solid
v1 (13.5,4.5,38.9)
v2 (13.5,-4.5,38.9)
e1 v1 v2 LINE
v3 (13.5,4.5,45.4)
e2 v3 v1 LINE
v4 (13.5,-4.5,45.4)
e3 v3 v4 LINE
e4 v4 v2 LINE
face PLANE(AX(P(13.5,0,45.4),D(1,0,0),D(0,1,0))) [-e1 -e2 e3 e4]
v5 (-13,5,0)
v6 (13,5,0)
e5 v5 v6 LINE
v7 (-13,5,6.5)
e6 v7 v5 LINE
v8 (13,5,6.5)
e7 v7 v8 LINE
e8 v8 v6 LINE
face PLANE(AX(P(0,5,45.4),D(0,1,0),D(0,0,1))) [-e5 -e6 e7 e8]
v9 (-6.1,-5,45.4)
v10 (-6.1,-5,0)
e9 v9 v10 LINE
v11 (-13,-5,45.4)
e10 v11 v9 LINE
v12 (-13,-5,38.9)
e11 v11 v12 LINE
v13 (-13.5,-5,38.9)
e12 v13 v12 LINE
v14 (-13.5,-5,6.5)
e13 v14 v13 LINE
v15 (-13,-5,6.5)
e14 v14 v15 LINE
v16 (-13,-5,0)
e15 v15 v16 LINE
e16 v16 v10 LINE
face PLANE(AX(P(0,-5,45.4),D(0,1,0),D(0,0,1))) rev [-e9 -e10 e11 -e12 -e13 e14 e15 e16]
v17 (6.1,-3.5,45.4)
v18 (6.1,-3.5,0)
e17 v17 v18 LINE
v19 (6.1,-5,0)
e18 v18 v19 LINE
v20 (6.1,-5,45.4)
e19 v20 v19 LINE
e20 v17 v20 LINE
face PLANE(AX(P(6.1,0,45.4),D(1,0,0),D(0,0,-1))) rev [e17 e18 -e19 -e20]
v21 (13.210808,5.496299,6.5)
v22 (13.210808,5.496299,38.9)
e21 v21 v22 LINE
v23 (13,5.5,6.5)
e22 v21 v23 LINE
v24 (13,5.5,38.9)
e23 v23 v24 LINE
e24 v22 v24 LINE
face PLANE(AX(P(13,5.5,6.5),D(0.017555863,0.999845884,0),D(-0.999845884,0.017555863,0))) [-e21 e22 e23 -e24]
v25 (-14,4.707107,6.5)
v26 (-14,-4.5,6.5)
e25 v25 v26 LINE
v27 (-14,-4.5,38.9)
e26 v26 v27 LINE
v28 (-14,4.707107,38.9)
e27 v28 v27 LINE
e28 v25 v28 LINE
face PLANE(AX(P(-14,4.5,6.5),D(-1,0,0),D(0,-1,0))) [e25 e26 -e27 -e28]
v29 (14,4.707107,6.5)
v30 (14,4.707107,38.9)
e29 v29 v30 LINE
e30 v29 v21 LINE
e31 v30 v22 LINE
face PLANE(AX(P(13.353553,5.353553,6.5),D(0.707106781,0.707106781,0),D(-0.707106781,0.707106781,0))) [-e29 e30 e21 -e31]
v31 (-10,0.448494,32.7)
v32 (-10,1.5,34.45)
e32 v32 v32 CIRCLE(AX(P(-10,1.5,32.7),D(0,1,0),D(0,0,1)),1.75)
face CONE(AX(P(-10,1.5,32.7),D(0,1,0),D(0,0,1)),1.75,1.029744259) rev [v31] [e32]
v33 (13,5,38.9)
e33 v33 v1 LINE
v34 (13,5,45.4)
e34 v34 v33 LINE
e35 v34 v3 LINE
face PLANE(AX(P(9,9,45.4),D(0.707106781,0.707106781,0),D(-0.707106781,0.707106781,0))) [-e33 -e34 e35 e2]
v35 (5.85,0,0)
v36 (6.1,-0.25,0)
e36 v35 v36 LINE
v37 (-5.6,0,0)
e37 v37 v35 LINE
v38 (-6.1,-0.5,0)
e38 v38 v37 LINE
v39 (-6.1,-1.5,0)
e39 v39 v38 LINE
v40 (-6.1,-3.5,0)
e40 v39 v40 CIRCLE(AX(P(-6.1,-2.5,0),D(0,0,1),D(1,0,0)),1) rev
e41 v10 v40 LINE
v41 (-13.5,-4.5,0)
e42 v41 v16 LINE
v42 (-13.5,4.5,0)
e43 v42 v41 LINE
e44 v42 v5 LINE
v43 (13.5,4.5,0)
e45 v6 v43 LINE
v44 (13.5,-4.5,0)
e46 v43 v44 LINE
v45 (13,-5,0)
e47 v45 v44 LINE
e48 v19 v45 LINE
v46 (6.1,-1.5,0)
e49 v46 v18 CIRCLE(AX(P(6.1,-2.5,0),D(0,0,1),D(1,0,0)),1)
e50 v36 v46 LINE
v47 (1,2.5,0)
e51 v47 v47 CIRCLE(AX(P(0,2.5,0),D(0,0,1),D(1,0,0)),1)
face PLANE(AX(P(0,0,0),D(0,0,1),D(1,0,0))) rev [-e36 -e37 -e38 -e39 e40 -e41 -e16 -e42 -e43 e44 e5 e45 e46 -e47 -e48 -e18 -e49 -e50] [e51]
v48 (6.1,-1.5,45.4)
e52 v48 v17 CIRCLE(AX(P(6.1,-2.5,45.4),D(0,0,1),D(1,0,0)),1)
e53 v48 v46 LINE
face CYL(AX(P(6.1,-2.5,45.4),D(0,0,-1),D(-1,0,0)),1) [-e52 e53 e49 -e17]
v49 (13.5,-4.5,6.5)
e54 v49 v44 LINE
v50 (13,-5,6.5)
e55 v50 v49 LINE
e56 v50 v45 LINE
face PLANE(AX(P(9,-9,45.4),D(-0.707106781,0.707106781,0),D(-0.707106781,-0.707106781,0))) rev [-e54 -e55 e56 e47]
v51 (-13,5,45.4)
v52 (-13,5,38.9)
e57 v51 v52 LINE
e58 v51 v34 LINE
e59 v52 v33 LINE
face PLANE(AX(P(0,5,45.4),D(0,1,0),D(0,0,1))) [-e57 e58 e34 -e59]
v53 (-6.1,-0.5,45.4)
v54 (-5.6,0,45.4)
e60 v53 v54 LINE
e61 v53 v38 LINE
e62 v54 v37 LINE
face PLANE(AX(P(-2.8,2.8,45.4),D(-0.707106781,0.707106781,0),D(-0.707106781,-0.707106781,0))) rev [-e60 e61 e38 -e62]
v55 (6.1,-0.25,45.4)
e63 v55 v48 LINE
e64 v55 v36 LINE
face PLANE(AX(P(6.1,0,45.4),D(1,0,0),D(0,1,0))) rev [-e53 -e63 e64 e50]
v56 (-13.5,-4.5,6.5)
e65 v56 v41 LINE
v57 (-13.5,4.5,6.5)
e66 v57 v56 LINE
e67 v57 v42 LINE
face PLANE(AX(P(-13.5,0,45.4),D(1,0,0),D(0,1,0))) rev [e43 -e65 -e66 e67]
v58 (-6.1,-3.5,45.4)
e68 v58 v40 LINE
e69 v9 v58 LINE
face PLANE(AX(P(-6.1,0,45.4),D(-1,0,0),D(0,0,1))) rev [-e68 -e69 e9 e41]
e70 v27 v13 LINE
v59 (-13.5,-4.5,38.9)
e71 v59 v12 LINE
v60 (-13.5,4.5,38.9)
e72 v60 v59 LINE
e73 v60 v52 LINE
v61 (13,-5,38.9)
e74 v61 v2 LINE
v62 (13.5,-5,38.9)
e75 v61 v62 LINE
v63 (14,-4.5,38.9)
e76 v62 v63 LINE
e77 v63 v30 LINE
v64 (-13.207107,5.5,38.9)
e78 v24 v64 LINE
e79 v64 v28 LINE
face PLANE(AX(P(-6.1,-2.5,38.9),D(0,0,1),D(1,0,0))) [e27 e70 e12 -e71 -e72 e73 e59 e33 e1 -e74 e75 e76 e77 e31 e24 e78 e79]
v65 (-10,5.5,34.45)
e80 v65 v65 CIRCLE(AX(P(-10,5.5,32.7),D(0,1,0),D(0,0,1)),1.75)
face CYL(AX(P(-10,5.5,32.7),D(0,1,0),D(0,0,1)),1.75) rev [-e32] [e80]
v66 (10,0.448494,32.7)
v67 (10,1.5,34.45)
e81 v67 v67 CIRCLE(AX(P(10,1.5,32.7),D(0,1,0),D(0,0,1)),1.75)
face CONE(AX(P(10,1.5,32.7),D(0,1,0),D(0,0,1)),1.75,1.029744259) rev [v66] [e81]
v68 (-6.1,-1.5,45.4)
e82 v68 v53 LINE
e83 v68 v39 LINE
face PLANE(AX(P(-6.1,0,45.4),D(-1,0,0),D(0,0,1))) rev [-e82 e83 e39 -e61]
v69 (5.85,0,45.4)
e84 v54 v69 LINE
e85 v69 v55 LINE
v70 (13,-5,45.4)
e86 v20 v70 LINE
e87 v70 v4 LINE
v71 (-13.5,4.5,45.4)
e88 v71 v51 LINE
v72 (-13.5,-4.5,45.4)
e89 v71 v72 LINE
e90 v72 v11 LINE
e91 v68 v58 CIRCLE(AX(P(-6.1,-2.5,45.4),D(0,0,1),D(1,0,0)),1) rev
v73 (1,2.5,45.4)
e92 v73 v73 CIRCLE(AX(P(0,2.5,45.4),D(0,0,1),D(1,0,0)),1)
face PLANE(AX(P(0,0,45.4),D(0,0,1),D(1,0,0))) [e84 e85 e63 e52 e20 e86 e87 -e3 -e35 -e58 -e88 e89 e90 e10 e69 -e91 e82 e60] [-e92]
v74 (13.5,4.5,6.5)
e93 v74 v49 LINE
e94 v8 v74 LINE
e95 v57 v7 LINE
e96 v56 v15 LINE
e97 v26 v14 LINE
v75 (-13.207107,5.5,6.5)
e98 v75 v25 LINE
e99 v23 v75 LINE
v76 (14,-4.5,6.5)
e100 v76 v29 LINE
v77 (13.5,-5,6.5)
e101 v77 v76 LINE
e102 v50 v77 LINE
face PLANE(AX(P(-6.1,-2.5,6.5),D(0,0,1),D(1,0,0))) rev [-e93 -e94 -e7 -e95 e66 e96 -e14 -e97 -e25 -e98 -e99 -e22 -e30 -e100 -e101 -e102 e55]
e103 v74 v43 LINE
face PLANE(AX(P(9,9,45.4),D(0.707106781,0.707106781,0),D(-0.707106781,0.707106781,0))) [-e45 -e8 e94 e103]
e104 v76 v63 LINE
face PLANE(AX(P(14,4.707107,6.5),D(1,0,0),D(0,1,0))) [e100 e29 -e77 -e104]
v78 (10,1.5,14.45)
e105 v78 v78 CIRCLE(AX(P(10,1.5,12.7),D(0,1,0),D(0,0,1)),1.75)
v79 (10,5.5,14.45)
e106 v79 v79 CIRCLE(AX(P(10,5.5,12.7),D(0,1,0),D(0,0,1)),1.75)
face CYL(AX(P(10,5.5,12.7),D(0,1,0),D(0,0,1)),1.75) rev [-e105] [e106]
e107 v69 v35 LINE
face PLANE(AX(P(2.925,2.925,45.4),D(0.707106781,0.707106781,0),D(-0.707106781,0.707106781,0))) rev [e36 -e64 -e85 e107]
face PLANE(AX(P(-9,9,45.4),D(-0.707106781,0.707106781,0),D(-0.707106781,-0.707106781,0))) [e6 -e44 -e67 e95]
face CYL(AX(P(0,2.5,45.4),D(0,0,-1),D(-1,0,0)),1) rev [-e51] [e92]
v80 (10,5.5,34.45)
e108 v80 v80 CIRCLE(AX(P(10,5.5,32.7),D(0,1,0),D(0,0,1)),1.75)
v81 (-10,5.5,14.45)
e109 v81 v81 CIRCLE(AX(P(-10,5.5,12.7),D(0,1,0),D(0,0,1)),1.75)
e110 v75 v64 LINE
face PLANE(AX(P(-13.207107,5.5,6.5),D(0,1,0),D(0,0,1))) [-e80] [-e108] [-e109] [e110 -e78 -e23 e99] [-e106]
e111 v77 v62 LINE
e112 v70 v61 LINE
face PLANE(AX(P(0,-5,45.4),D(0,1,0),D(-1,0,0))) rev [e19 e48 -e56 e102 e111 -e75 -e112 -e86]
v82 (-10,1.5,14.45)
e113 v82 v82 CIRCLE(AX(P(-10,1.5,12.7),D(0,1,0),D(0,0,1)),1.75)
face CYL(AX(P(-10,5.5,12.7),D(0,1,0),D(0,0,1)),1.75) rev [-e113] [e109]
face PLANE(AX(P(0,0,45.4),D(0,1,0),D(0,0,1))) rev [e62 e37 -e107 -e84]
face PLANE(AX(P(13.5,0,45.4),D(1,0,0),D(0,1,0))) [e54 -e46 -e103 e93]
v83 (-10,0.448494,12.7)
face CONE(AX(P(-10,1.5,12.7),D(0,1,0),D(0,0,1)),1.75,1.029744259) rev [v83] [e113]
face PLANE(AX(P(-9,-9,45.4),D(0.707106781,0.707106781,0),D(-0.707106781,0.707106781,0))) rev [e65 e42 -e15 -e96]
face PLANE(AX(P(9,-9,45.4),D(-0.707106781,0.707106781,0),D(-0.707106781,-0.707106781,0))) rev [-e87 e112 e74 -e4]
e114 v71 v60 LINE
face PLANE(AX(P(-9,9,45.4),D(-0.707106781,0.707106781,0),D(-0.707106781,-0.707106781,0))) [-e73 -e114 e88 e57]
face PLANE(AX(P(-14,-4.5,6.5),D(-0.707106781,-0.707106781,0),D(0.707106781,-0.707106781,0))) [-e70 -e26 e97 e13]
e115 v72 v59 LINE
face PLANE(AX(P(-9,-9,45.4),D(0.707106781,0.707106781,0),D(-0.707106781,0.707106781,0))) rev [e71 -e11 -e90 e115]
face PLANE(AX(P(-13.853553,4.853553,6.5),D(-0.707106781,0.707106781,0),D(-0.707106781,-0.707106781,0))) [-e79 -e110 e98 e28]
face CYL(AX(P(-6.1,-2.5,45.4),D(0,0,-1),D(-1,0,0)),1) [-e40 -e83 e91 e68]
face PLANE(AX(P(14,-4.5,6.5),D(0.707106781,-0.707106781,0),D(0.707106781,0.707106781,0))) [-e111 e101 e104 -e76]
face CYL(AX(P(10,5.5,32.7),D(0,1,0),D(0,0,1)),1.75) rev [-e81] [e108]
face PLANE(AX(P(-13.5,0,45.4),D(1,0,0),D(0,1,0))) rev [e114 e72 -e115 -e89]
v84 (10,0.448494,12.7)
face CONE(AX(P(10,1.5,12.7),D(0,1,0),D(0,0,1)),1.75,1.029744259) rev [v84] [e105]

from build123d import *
from build123d.topology import SkipClean

# Parameters (mm, degrees)
SKETCH1_R                 = 1
BOSS_EXTRUDE1_DEPTH       = 45.4
BOSS_EXTRUDE2_START       = -38.9
SKETCH5_R                 = 1
BOSS_EXTRUDE2_DEPTH       = 32.4
M5X0_8_TAPPED_HOLE1_D     = 3.5
M5X0_8_TAPPED_HOLE1_DEPTH = 4
M5X0_8_TAPPED_HOLE1_TIP   = 1.051506083


with BuildPart() as part:
    # Sketch1 → Boss-Extrude1 (new body)
    with BuildSketch(Plane.XY):
        with BuildLine():
            Line((-13.5, -4.5), (-13, -5))
            Line((-13, -5), (-6.1, -5))
            Line((-6.1, -5), (-6.1, -3.5))
            ThreePointArc((-6.1, -3.5), (-5.1, -2.5), (-6.1, -1.5))
            Line((-6.1, -1.5), (-6.1, -0.5))
            Line((-6.1, -0.5), (-5.6, 0))
            Line((-5.6, 0), (5.85, 0))
            Line((5.85, 0), (6.1, -0.25))
            Line((6.1, -0.25), (6.1, -1.5))
            ThreePointArc((6.1, -1.5), (5.1, -2.5), (6.1, -3.5))
            Line((6.1, -3.5), (6.1, -5))
            Line((6.1, -5), (13, -5))
            Line((13, -5), (13.5, -4.5))
            Line((13.5, -4.5), (13.5, 4.5))
            Line((13.5, 4.5), (13, 5))
            Line((13, 5), (-13, 5))
            Line((-13, 5), (-13.5, 4.5))
            Line((-13.5, 4.5), (-13.5, -4.5))
        make_face()
        with Locations((0, 2.5)):
            Circle(SKETCH1_R, mode=Mode.SUBTRACT)
    extrude(amount=BOSS_EXTRUDE1_DEPTH)

    # Sketch5 → Boss-Extrude2 (add)
    with SkipClean():  # the faces are left unmerged after this step: merging them gives an invalid solid
        with BuildSketch(Plane.XY.offset(45.4).offset(BOSS_EXTRUDE2_START)):
            with BuildLine():
                Line((13, 5.5), (13.210808273, 5.496298508))
                Line((13.210808273, 5.496298508), (13.353553391, 5.353553391))
                Line((13.353553391, 5.353553391), (14, 4.707106781))
                Line((14, 4.707106781), (14, -4.5))
                Line((14, -4.5), (13.5, -5))
                Line((13.5, -5), (6.1, -5))
                Line((6.1, -5), (6.1, -3.5))
                ThreePointArc((6.1, -3.5), (5.1, -2.5), (6.1, -1.5))
                Line((6.1, -1.5), (6.1, -0.25))
                Line((6.1, -0.25), (5.85, 0))
                Line((5.85, 0), (-5.6, 0))
                Line((-5.6, 0), (-6.1, -0.5))
                Line((-6.1, -0.5), (-6.1, -1.5))
                ThreePointArc((-6.1, -1.5), (-5.1, -2.5), (-6.1, -3.5))
                Line((-6.1, -3.5), (-6.1, -5))
                Line((-6.1, -5), (-13.5, -5))
                Line((-13.5, -5), (-14, -4.5))
                Line((-14, -4.5), (-14, 4.5))
                Line((-14, 4.5), (-14, 4.707106781))
                Line((-14, 4.707106781), (-13.853553391, 4.853553391))
                Line((-13.853553391, 4.853553391), (-13.207106781, 5.5))
                Line((-13.207106781, 5.5), (13, 5.5))
            make_face()
            with Locations((0, 2.5)):
                Circle(SKETCH5_R, mode=Mode.SUBTRACT)
        extrude(amount=BOSS_EXTRUDE2_DEPTH)
    add(part.part.scale(1), mode=Mode.REPLACE)  # the faces are merged on a copy

    # M5x0.8 Tapped Hole1
    with Locations(Plane(origin=(0, 5.5, 0), x_dir=(1, 0, 0), z_dir=(0, 1, 0))):
        with Locations((-10, -12.7), (-10, -32.7), (10, -32.7), (10, -12.7)):
            Hole(M5X0_8_TAPPED_HOLE1_D / 2, depth=M5X0_8_TAPPED_HOLE1_DEPTH)
            with Locations((0, 0, -(M5X0_8_TAPPED_HOLE1_DEPTH + M5X0_8_TAPPED_HOLE1_TIP / 2))):  # 118° drill point
                Cone(0, M5X0_8_TAPPED_HOLE1_D / 2, M5X0_8_TAPPED_HOLE1_TIP, mode=Mode.SUBTRACT)


solid = part.part
